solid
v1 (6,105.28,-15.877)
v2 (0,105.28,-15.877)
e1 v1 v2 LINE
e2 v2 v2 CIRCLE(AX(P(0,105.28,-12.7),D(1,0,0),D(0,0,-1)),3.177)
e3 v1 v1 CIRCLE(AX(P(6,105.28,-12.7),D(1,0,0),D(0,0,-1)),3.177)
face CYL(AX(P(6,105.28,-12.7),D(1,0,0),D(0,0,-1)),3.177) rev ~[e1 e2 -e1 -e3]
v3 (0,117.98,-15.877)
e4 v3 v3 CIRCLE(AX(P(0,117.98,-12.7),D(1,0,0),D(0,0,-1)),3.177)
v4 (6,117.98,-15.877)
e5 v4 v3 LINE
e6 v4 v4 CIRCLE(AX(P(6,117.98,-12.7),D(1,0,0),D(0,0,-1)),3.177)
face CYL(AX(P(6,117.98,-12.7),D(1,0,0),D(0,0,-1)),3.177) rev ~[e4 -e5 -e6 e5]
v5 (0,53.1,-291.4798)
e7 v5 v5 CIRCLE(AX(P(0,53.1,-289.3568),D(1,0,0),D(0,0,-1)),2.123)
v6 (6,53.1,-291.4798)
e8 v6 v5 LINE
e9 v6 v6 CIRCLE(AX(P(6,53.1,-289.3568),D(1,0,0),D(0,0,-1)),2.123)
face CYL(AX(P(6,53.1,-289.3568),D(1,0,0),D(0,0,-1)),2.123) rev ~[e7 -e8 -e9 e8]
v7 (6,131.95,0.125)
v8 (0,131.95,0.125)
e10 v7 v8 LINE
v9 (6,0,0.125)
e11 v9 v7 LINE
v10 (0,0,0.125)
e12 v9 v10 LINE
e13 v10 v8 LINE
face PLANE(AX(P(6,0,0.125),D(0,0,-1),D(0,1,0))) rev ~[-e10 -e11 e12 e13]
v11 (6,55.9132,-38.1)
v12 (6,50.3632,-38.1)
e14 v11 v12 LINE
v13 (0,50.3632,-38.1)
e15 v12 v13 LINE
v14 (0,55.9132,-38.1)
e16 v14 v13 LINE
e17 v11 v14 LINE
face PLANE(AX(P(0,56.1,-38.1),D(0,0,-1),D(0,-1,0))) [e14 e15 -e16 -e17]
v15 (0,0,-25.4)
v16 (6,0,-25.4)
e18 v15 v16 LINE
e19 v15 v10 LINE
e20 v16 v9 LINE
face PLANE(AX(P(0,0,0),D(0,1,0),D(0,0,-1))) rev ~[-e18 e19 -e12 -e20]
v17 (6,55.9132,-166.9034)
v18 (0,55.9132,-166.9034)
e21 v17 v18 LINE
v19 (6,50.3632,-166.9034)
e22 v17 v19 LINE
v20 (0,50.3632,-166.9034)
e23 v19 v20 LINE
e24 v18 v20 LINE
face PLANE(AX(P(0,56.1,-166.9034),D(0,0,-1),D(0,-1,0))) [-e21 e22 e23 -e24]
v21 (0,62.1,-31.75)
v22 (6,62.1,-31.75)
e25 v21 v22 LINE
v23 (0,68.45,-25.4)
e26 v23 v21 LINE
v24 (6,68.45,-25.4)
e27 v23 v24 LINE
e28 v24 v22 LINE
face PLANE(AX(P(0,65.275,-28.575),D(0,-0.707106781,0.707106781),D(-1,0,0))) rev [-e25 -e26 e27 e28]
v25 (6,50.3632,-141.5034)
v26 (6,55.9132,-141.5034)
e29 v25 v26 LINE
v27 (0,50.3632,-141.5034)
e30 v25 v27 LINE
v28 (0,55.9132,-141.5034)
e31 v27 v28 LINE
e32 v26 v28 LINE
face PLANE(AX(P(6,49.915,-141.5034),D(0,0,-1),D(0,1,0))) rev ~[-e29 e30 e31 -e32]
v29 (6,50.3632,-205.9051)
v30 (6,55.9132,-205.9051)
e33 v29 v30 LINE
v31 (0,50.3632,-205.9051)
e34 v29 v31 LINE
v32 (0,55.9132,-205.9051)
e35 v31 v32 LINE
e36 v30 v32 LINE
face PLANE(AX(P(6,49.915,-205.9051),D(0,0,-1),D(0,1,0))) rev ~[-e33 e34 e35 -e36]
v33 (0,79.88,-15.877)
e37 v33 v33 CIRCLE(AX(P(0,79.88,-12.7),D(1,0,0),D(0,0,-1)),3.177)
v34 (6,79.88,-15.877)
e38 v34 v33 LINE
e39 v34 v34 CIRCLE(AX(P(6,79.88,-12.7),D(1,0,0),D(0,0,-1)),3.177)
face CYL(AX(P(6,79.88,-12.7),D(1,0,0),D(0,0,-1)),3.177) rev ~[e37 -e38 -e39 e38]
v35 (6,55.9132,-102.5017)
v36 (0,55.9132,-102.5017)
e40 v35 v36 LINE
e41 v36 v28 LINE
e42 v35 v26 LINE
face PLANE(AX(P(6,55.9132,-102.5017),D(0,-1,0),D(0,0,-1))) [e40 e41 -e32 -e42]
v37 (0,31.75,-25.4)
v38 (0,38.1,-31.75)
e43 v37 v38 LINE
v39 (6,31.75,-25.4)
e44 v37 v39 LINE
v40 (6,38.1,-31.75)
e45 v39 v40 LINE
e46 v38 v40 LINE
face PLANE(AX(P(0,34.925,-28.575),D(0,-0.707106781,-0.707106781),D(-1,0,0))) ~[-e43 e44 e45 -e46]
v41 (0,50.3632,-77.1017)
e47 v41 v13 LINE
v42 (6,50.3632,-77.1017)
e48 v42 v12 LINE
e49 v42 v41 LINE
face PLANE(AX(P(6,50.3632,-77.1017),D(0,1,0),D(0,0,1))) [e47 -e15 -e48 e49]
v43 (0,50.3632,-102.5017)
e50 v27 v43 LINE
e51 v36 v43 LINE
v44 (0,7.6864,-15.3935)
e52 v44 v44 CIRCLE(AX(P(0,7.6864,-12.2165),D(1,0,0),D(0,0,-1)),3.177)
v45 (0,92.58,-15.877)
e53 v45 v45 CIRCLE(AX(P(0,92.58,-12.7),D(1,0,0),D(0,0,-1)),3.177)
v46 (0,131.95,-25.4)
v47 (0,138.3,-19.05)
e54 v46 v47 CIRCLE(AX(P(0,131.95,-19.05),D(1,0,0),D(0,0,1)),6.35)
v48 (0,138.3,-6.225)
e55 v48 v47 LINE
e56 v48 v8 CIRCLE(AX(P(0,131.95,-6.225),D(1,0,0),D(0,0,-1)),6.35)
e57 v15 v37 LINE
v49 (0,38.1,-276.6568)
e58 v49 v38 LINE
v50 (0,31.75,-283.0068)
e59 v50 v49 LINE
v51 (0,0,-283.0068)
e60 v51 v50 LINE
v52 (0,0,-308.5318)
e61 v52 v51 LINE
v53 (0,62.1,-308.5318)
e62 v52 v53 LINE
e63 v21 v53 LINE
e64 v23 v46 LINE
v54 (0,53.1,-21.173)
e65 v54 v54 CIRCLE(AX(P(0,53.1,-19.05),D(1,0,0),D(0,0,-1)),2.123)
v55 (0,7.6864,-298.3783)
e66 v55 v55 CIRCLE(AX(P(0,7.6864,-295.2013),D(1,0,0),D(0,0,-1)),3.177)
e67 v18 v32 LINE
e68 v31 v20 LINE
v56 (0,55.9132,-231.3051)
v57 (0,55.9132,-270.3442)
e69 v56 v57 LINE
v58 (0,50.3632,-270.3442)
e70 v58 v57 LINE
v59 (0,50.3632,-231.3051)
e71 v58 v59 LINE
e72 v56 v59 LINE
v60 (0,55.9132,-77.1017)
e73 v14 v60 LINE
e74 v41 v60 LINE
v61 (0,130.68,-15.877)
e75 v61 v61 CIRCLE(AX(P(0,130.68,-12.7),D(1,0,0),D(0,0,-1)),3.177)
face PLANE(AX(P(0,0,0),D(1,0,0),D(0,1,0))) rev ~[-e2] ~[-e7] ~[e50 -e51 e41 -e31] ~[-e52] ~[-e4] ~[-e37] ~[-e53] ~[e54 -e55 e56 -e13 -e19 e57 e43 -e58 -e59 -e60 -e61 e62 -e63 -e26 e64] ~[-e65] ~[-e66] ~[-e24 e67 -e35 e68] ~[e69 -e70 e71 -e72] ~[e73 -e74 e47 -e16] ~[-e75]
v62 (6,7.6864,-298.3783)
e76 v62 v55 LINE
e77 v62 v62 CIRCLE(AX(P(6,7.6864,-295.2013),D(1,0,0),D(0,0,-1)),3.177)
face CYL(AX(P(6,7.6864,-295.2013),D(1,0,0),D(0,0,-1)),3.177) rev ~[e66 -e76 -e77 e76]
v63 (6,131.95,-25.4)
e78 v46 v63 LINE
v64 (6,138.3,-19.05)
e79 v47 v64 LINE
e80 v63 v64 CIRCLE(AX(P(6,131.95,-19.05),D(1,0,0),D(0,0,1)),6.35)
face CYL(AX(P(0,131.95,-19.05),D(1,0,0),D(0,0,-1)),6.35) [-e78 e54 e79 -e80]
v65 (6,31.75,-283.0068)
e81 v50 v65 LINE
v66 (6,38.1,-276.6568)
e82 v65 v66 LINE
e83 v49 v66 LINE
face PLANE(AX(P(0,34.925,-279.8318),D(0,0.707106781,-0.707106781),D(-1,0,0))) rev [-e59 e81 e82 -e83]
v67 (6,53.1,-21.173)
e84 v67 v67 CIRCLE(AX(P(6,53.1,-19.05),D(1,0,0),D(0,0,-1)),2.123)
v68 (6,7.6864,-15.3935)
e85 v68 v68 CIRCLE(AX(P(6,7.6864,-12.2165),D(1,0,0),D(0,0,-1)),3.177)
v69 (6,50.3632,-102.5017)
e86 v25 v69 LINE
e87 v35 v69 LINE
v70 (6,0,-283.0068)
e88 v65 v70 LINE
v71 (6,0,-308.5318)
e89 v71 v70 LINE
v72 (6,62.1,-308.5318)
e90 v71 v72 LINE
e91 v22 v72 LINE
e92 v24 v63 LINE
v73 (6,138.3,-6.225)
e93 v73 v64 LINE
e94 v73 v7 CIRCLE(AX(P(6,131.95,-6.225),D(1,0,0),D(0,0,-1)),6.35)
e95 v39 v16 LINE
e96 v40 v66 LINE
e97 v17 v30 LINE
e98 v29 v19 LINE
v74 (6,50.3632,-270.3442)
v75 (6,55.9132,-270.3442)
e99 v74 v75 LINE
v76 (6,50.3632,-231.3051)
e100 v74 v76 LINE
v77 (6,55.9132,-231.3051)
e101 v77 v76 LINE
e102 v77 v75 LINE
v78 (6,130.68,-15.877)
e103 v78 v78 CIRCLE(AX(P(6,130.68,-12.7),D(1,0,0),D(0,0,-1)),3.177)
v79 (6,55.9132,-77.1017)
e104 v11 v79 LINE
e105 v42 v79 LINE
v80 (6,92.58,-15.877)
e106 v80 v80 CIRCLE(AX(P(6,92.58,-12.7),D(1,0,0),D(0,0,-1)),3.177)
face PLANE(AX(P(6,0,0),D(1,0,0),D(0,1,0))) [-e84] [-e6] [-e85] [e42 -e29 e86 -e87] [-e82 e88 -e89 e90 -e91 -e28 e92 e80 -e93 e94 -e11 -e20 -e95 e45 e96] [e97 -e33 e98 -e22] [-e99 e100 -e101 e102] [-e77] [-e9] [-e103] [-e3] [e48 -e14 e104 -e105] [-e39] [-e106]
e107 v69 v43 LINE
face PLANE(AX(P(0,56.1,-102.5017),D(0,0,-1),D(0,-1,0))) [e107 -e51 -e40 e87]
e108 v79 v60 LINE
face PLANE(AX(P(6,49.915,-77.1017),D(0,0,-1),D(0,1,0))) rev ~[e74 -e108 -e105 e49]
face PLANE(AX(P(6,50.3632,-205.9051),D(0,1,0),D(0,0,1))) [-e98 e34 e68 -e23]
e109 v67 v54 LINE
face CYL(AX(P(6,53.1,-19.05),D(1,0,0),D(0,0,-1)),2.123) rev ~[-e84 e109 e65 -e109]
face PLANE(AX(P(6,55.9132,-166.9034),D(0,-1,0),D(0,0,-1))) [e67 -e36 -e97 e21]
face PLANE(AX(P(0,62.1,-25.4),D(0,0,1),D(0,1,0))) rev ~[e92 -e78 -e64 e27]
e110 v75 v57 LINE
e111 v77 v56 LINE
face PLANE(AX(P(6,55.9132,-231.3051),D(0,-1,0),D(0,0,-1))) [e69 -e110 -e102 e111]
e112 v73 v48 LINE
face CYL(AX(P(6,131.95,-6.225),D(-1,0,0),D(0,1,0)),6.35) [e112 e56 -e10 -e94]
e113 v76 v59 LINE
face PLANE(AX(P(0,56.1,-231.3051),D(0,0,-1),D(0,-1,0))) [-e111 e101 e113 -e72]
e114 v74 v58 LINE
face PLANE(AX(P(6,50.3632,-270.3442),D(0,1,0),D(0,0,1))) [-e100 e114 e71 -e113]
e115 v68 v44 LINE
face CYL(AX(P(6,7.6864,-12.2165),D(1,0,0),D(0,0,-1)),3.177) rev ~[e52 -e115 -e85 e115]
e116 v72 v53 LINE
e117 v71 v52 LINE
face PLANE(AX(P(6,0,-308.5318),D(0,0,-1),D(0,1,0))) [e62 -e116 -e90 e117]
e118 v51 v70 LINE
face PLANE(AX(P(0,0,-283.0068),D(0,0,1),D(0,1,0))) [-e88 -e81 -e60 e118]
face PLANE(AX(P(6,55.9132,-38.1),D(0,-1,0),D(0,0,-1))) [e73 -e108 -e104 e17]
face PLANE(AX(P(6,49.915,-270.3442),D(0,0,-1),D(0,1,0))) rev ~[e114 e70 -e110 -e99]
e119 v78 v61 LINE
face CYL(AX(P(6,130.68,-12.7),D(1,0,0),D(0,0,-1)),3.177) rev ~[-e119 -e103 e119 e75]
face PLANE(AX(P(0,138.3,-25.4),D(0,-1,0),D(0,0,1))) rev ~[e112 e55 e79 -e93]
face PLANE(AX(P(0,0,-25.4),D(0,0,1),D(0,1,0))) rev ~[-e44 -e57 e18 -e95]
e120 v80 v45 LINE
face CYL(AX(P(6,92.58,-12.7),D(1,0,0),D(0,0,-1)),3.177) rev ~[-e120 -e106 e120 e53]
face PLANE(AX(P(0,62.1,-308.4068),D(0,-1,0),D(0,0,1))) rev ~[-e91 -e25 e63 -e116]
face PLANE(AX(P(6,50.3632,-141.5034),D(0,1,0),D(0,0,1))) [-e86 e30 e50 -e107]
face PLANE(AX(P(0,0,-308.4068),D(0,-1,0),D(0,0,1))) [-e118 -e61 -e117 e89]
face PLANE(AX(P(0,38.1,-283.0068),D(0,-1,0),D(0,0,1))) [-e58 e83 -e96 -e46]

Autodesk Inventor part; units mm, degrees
ref_plane "YZ Plane" through (0, 0, 0) normal (1, 0, 0) x (0, 1, 0)
ref_plane "XZ Plane" through (0, 0, 0) normal (0, 1, 0) x (-1, 0, 0)
ref_plane "XY Plane" through (0, 0, 0) normal (0, 0, 1) x (1, 0, 0)
sketch "Sketch1" plane through (0, 0, 0) normal (1, 0, 0) x (0, 1, 0)
  line L0 (0, 0) -> (0, -38.1)
  line L1 (0, -38.1) -> (38.1, -38.1)
  line L2 (0, -308.4068) -> (0, -270.3068)
  line L3 (0, -270.3068) -> (38.1, -270.3068)
  line L4 (0, -308.4068) -> (62.1, -308.4068)
  line L5 (62.1, -308.4068) -> (62.1, -25.4)
  line L6 (62.1, -25.4) -> (138.3, -25.4)
  line L7 (138.3, -25.4) -> (138.3, 0)
  line L8 (38.1, -38.1) -> (38.1, -270.3068)
  line L9 (138.3, 0) -> (0, 0)
  line L10 (56.1, -38.1) -> (50.1, -38.1)
  line L11 (50.1, -38.1) -> (50.1, -77.1017)
  line L12 (50.1, -77.1017) -> (56.1, -77.1017)
  line L13 (56.1, -77.1017) -> (56.1, -38.1)
  line L14 (56.1, -102.5017) -> (50.1, -102.5017)
  line L15 (50.1, -102.5017) -> (50.1, -141.5034)
  line L16 (50.1, -141.5034) -> (56.1, -141.5034)
  line L17 (56.1, -141.5034) -> (56.1, -102.5017)
  line L18 (56.1, -166.9034) -> (50.1, -166.9034)
  line L19 (50.1, -166.9034) -> (50.1, -205.9051)
  line L20 (50.1, -205.9051) -> (56.1, -205.9051)
  line L21 (56.1, -205.9051) -> (56.1, -166.9034)
  line L22 (56.1, -231.3051) -> (50.1, -231.3051)
  line L23 (50.1, -231.3051) -> (50.1, -270.3068)
  line L24 (50.1, -270.3068) -> (56.1, -270.3068)
  line L25 (56.1, -270.3068) -> (56.1, -231.3051)
  point P0 (0, -289.3568)
  point P1 (56.1, -57.6008)
  point P2 (56.1, -122.0026)
  point P3 (56.1, -186.4043)
  point P4 (56.1, -250.806)
  dimension "d1" = 38.1
  dimension "d2" = 38.1
  dimension "d4" = 38.1
  dimension "d5" = 24
  dimension "d6" = 76.2
  dimension "d16" = 308.4068
  dimension "d17" = 6
  dimension "d18" = 39.0017
  dimension "d21" = 6
  dimension "d22" = 39.0017
  dimension "d23" = 25.4
  dimension "d24" = 6
  dimension "d25" = 39.0017
  dimension "d26" = 25.4
  dimension "d27" = 6
  dimension "d28" = 39.0017
  dimension "d29" = 25.4
  dimension "d49" = 25.4
  dimension "d61" = 38.1
  dimension "d62" = 50.1
extrude "Extrusion1" add sketch "Sketch1" along normal blind 6
sketch "Sketch2" plane through (0, 0, 0) normal (-1, 0, 0) x (0, 0, 1)
  circle A0 centre (-12.2165, 7.6864) radius 3.175 projected
  circle A1 centre (-295.2013, 7.6864) radius 3.175 projected
  point P0 (0, 0)
sketch "Sketch3" plane through (0, 0, 0) normal (-1, 0, 0) x (0, 0, 1)
  line L0 (0, 0) -> (-38.1, 0) projected
  line L1 (-38.1, 0) -> (-25.4, 0)
  line L2 (-25.4, 0) -> (-25.4, 38.1)
  line L3 (-25.4, 38.1) -> (-38.1, 38.1)
  line L4 (-38.1, 38.1) -> (-38.1, 0)
  line L5 (-270.3068, 38.1) -> (-270.3068, 0) projected
  line L6 (-270.3068, 0) -> (-283.0068, 0)
  line L7 (-283.0068, 0) -> (-283.0068, 38.1)
  line L8 (-283.0068, 38.1) -> (-270.3068, 38.1)
  line L9 (-270.3068, 38.1) -> (-270.3068, 0)
  dimension "d37" = 12.7
  dimension "d90" = 38.1
extrude "Extrusion3" cut sketch "Sketch3" against normal through all
chamfer "Chamfer1" distance 6.35 angle 45 2 edges at (3, 38.1, -283.0068) (3, 38.1, -25.4)
chamfer "Chamfer2" distance 6.35 angle 45 1 edges at (3, 62.1, -25.4)
fillet "Fillet1" radius 6.35 2 edges at (3, 138.3, -25.4) (3, 138.3, 0)
sketch "Sketch4" plane through (6, 0, 0) normal (1, 0, 0) x (0, 0, -1)
  circle A0 centre (12.7, 130.68) radius 3.175
  line L0 (19.05, 138.3) -> (6.35, 138.3) projected
  line L1 (25.4, 68.45) -> (25.4, 131.95) projected
  circle A1 centre (12.7, 117.98) radius 3.175
  circle A2 centre (12.7, 105.28) radius 3.175
  circle A3 centre (12.7, 92.58) radius 3.175
  circle A4 centre (12.7, 79.88) radius 3.175
  point P0 (0, 0)
  point P1 (12.7, 138.3)
  dimension "d50" = 6.35
  dimension "d51" = 7.62
  dimension "d54" = 12.7
sketch "Sketch5" plane through (6, 0, 0) normal (1, 0, 0) x (0, 0, -1)
  circle A0 centre (19.05, 53.1) radius 1.6256
  circle A1 centre (289.3568, 53.1) radius 1.6256
  line L0 (0, 131.95) -> (0, 0) projected
  line L1 (308.4068, 0) -> (308.4068, 62.1) projected
  line L2 (270.3068, 56.1) -> (270.3068, 50.1) projected
  line L3 (38.1, 50.1) -> (38.1, 56.1) projected
  point P0 (270.3068, 53.1)
  point P1 (38.1, 53.1)
  dimension "d63" = 3.2512
  dimension "d64" = 3.2512
  dimension "d65" = 19.05
  dimension "d66" = 19.05
hole "Hole1" at (0, 7.6864, -12.2165) at (0, 7.6864, -295.2013) direction (1, 0, 0) diameter 6.604 depth 17.0942 tip angle 118 clearance for "Hex Head Bolt" size "M6" standard "Ansi Metric M Profile"
hole "Hole2" at (6, 79.88, -12.7) at (6, 92.58, -12.7) at (6, 105.28, -12.7) at (6, 117.98, -12.7) at (6, 130.68, -12.7) direction (-1, 0, 0) diameter 6.604 depth 17.0942 tip angle 118 clearance for "Hex Head Bolt" size "M6" standard "Ansi Metric M Profile"
hole "Hole3" at (6, 53.1, -289.3568) at (6, 53.1, -19.05) direction (-1, 0, 0) diameter 4.4958 depth 17.0942 tip angle 118 clearance for "Socket Head Cap Screw" size "M4" standard "Ansi Metric M Profile"
sketch "Sketch6" plane through (6, 0, 0) normal (1, 0, 0) x (0, 0, -1)
  line L0 (0, 0) -> (-0.125, 0)
  line L1 (-0.125, 0) -> (-0.125, 138.3)
  line L2 (-0.125, 138.3) -> (0, 138.3)
  line L3 (0, 131.95) -> (0, 0)
  line L4 (19.05, 138.3) -> (6.35, 138.3) projected
  line L5 (0, 138.3) -> (6.35, 138.3)
  arc A0 (6.35, 138.3) -> (0, 131.95) centre (6.35, 131.95) ccw projected
  line L6 (0, 131.95) -> (0, 0) projected
  line L7 (308.4068, 0) -> (308.4068, 62.1) projected
  line L8 (308.4068, 0) -> (308.5318, 0)
  line L9 (308.5318, 0) -> (308.5318, 62.1)
  line L10 (308.5318, 62.1) -> (308.4068, 62.1)
  line L11 (308.4068, 62.1) -> (308.4068, 0)
  dimension "d91" = 0.125
  dimension "d92" = 0.125
extrude "Extrusion6" add sketch "Sketch6" against normal up to surface (6 mm away)
sketch "Sketch7" plane through (6, 0, 0) normal (1, 0, 0) x (0, 0, -1)
  line L0 (38.1, 49.915) -> (77.1017, 49.915)
  line L1 (77.1017, 49.915) -> (77.1017, 56.285)
  line L2 (77.1017, 56.285) -> (38.1, 56.285)
  line L3 (38.1, 56.285) -> (38.1, 49.915)
  line L4 (102.5017, 49.915) -> (141.5034, 49.915)
  line L5 (141.5034, 49.915) -> (141.5034, 56.285)
  line L6 (141.5034, 56.285) -> (102.5017, 56.285)
  line L7 (102.5017, 56.285) -> (102.5017, 49.915)
  line L8 (166.9034, 49.915) -> (205.9051, 49.915)
  line L9 (205.9051, 49.915) -> (205.9051, 56.285)
  line L10 (205.9051, 56.285) -> (166.9034, 56.285)
  line L11 (166.9034, 56.285) -> (166.9034, 49.915)
  line L12 (231.3051, 49.915) -> (270.3442, 49.915)
  line L13 (270.3442, 49.915) -> (270.3442, 56.285)
  line L14 (270.3442, 56.285) -> (231.3051, 56.285)
  line L15 (231.3051, 56.285) -> (231.3051, 49.915)
  point P0 (0, 0)
  dimension "d95" = 6.37
  dimension "d96" = 6.37
extrude "Extrusion7" cut sketch "Sketch7" against normal through all
fillet "Fillet2" radius 6.35 1 edges at (3, 138.3, 0.125)
sketch "Sketch8" plane through (6, 0, 0) normal (1, 0, 0) x (0, 0, -1)
  circle A0 centre (19.05, 53.1) radius 2.2479 projected
  circle A1 centre (19.05, 53.1) radius 2.123
  circle A2 centre (289.3568, 53.1) radius 2.2479 projected
  circle A3 centre (289.3568, 53.1) radius 2.123
  circle A4 centre (12.2165, 7.6864) radius 3.302 projected
  circle A5 centre (12.2165, 7.6864) radius 3.177
  circle A6 centre (289.3568, 53.1) radius 8.2692
  circle A7 centre (19.05, 53.1) radius 5.3993
  circle A8 centre (12.2165, 7.6864) radius 6.0183
  circle A9 centre (295.2013, 7.6864) radius 3.302 projected
  circle A10 centre (295.2013, 7.6864) radius 3.177
  circle A11 centre (295.2013, 7.6864) radius 6.2668
  circle A12 centre (12.7, 79.88) radius 3.302 projected
  circle A13 centre (12.7, 79.88) radius 3.177
  circle A14 centre (12.7, 79.88) radius 5.8929
  circle A15 centre (12.7, 92.58) radius 3.302 projected
  circle A16 centre (12.7, 92.58) radius 3.177
  circle A17 centre (12.7, 92.58) radius 5.9761
  circle A18 centre (12.7, 105.28) radius 3.302 projected
  circle A19 centre (12.7, 105.28) radius 3.177
  circle A20 centre (12.7, 105.28) radius 5.9666
  circle A21 centre (12.7, 117.98) radius 3.302 projected
  circle A22 centre (12.7, 117.98) radius 3.177
  circle A23 centre (12.7, 117.98) radius 6.163
  circle A24 centre (12.7, 130.68) radius 6.466
  circle A25 centre (12.7, 130.68) radius 3.177
  point P0 (0, 0)
  dimension "d100" = 4.246
  dimension "d101" = 4.246
  dimension "d102" = 6.354
  dimension "d103" = 6.354
  dimension "d104" = 6.354
  dimension "d105" = 6.354
  dimension "d106" = 6.354
  dimension "d107" = 6.354
  dimension "d108" = 6.354
extrude "Extrusion8" add sketch "Sketch8" against normal up to surface (6 mm away) contours A0 | A2 | A4 | A6 | A7 | A8 | A9 | A11 | A12 | A14 | A15 | A17 | A18 | A20 | A21 | A23 | A24
sketch "Sketch9" plane through (6, 0, 0) normal (1, 0, 0) x (0, 0, -1)
  line L0 (38.1, 55.9132) -> (77.1017, 55.9132)
  line L1 (77.1017, 55.9132) -> (77.1017, 50.3632)
  line L2 (77.1017, 50.3632) -> (38.1, 50.3632)
  line L3 (38.1, 50.3632) -> (38.1, 55.9132)
  line L4 (102.5017, 55.9132) -> (141.5034, 55.9132)
  line L5 (141.5034, 55.9132) -> (141.5034, 50.3632)
  line L6 (141.5034, 50.3632) -> (102.5017, 50.3632)
  line L7 (102.5017, 50.3632) -> (102.5017, 55.9132)
  line L8 (166.9034, 55.9132) -> (205.9051, 55.9132)
  line L9 (205.9051, 55.9132) -> (205.9051, 50.3632)
  line L10 (205.9051, 50.3632) -> (166.9034, 50.3632)
  line L11 (166.9034, 50.3632) -> (166.9034, 55.9132)
  line L12 (231.3051, 55.9132) -> (270.3442, 55.9132)
  line L13 (270.3442, 55.9132) -> (270.3442, 50.3632)
  line L14 (270.3442, 50.3632) -> (231.3051, 50.3632)
  line L15 (231.3051, 50.3632) -> (231.3051, 55.9132)
  line L16 (77.1017, 56.285) -> (77.1017, 49.915) projected
  line L17 (38.1, 49.915) -> (38.1, 56.285) projected
  line L18 (102.5017, 49.915) -> (102.5017, 56.285) projected
  line L19 (141.5034, 56.285) -> (141.5034, 49.915) projected
  line L20 (166.9034, 49.915) -> (166.9034, 56.285) projected
  line L21 (205.9051, 56.285) -> (205.9051, 49.915) projected
  line L22 (231.3051, 49.915) -> (231.3051, 56.285) projected
  line L23 (270.3442, 56.285) -> (270.3442, 49.915) projected
  circle A0 centre (12.7, 79.88) radius 3.177 projected
  circle A1 centre (12.2165, 7.6864) radius 3.177 projected
  circle A2 centre (12.7, 105.28) radius 3.177 projected
  circle A3 centre (295.2013, 7.6864) radius 3.177 projected
  circle A4 centre (12.7, 117.98) radius 3.177 projected
  circle A5 centre (19.05, 53.1) radius 2.123 projected
  circle A6 centre (12.7, 92.58) radius 3.177 projected
  circle A7 centre (289.3568, 53.1) radius 2.123 projected
  circle A8 centre (12.7, 130.68) radius 3.177 projected
  line L24 (231.3051, 49.915) -> (231.3051, 56.285) projected
  line L25 (231.3051, 56.285) -> (270.3442, 56.285) projected
  line L26 (270.3442, 56.285) -> (270.3442, 49.915) projected
  line L27 (270.3442, 49.915) -> (231.3051, 49.915) projected
  arc A9 (6.225, 138.3) -> (-0.125, 131.95) centre (6.225, 131.95) ccw projected
  line L28 (-0.125, 131.95) -> (-0.125, 0) projected
  line L29 (-0.125, 0) -> (25.4, 0) projected
  line L30 (25.4, 0) -> (25.4, 31.75) projected
  line L31 (31.75, 38.1) -> (25.4, 31.75) projected
  line L32 (31.75, 38.1) -> (276.6568, 38.1) projected
  line L33 (283.0068, 31.75) -> (276.6568, 38.1) projected
  line L34 (283.0068, 31.75) -> (283.0068, 0) projected
  line L35 (283.0068, 0) -> (308.5318, 0) projected
  line L36 (308.5318, 0) -> (308.5318, 62.1) projected
  line L37 (308.5318, 62.1) -> (31.75, 62.1) projected
  line L38 (25.4, 68.45) -> (31.75, 62.1) projected
  line L39 (25.4, 68.45) -> (25.4, 131.95) projected
  arc A10 (25.4, 131.95) -> (19.05, 138.3) centre (19.05, 131.95) ccw projected
  line L40 (19.05, 138.3) -> (6.225, 138.3) projected
  line L41 (77.1017, 56.285) -> (77.1017, 49.915) projected
  line L42 (77.1017, 49.915) -> (38.1, 49.915) projected
  line L43 (38.1, 49.915) -> (38.1, 56.285) projected
  line L44 (38.1, 56.285) -> (77.1017, 56.285) projected
  line L45 (205.9051, 56.285) -> (205.9051, 49.915) projected
  line L46 (205.9051, 49.915) -> (166.9034, 49.915) projected
  line L47 (166.9034, 49.915) -> (166.9034, 56.285) projected
  line L48 (166.9034, 56.285) -> (205.9051, 56.285) projected
  line L49 (141.5034, 56.285) -> (141.5034, 49.915) projected
  line L50 (141.5034, 49.915) -> (102.5017, 49.915) projected
  line L51 (102.5017, 49.915) -> (102.5017, 56.285) projected
  line L52 (102.5017, 56.285) -> (141.5034, 56.285) projected
  point P0 (0, 0)
  dimension "d111" = 5.55
  dimension "d112" = 0
  dimension "d113" = 0
  dimension "d114" = 0
  dimension "d115" = 0
  dimension "d116" = 0
  dimension "d117" = 0
  dimension "d118" = 0
  dimension "d119" = 0
extrude "Extrusion9" add sketch "Sketch9" against normal blind 6 contours L17 L44 L16 L0 | L2 L16 L42 L17 | L18 L52 L19 L4 | L6 L19 L50 L18 | L20 L48 L21 L8 | L10 L21 L46 L20 | L22 L25 L23 L12 | L14 L23 L27 L22
equation "\"d108\" = d107"
properties part number "V3 Mounting Wall"
